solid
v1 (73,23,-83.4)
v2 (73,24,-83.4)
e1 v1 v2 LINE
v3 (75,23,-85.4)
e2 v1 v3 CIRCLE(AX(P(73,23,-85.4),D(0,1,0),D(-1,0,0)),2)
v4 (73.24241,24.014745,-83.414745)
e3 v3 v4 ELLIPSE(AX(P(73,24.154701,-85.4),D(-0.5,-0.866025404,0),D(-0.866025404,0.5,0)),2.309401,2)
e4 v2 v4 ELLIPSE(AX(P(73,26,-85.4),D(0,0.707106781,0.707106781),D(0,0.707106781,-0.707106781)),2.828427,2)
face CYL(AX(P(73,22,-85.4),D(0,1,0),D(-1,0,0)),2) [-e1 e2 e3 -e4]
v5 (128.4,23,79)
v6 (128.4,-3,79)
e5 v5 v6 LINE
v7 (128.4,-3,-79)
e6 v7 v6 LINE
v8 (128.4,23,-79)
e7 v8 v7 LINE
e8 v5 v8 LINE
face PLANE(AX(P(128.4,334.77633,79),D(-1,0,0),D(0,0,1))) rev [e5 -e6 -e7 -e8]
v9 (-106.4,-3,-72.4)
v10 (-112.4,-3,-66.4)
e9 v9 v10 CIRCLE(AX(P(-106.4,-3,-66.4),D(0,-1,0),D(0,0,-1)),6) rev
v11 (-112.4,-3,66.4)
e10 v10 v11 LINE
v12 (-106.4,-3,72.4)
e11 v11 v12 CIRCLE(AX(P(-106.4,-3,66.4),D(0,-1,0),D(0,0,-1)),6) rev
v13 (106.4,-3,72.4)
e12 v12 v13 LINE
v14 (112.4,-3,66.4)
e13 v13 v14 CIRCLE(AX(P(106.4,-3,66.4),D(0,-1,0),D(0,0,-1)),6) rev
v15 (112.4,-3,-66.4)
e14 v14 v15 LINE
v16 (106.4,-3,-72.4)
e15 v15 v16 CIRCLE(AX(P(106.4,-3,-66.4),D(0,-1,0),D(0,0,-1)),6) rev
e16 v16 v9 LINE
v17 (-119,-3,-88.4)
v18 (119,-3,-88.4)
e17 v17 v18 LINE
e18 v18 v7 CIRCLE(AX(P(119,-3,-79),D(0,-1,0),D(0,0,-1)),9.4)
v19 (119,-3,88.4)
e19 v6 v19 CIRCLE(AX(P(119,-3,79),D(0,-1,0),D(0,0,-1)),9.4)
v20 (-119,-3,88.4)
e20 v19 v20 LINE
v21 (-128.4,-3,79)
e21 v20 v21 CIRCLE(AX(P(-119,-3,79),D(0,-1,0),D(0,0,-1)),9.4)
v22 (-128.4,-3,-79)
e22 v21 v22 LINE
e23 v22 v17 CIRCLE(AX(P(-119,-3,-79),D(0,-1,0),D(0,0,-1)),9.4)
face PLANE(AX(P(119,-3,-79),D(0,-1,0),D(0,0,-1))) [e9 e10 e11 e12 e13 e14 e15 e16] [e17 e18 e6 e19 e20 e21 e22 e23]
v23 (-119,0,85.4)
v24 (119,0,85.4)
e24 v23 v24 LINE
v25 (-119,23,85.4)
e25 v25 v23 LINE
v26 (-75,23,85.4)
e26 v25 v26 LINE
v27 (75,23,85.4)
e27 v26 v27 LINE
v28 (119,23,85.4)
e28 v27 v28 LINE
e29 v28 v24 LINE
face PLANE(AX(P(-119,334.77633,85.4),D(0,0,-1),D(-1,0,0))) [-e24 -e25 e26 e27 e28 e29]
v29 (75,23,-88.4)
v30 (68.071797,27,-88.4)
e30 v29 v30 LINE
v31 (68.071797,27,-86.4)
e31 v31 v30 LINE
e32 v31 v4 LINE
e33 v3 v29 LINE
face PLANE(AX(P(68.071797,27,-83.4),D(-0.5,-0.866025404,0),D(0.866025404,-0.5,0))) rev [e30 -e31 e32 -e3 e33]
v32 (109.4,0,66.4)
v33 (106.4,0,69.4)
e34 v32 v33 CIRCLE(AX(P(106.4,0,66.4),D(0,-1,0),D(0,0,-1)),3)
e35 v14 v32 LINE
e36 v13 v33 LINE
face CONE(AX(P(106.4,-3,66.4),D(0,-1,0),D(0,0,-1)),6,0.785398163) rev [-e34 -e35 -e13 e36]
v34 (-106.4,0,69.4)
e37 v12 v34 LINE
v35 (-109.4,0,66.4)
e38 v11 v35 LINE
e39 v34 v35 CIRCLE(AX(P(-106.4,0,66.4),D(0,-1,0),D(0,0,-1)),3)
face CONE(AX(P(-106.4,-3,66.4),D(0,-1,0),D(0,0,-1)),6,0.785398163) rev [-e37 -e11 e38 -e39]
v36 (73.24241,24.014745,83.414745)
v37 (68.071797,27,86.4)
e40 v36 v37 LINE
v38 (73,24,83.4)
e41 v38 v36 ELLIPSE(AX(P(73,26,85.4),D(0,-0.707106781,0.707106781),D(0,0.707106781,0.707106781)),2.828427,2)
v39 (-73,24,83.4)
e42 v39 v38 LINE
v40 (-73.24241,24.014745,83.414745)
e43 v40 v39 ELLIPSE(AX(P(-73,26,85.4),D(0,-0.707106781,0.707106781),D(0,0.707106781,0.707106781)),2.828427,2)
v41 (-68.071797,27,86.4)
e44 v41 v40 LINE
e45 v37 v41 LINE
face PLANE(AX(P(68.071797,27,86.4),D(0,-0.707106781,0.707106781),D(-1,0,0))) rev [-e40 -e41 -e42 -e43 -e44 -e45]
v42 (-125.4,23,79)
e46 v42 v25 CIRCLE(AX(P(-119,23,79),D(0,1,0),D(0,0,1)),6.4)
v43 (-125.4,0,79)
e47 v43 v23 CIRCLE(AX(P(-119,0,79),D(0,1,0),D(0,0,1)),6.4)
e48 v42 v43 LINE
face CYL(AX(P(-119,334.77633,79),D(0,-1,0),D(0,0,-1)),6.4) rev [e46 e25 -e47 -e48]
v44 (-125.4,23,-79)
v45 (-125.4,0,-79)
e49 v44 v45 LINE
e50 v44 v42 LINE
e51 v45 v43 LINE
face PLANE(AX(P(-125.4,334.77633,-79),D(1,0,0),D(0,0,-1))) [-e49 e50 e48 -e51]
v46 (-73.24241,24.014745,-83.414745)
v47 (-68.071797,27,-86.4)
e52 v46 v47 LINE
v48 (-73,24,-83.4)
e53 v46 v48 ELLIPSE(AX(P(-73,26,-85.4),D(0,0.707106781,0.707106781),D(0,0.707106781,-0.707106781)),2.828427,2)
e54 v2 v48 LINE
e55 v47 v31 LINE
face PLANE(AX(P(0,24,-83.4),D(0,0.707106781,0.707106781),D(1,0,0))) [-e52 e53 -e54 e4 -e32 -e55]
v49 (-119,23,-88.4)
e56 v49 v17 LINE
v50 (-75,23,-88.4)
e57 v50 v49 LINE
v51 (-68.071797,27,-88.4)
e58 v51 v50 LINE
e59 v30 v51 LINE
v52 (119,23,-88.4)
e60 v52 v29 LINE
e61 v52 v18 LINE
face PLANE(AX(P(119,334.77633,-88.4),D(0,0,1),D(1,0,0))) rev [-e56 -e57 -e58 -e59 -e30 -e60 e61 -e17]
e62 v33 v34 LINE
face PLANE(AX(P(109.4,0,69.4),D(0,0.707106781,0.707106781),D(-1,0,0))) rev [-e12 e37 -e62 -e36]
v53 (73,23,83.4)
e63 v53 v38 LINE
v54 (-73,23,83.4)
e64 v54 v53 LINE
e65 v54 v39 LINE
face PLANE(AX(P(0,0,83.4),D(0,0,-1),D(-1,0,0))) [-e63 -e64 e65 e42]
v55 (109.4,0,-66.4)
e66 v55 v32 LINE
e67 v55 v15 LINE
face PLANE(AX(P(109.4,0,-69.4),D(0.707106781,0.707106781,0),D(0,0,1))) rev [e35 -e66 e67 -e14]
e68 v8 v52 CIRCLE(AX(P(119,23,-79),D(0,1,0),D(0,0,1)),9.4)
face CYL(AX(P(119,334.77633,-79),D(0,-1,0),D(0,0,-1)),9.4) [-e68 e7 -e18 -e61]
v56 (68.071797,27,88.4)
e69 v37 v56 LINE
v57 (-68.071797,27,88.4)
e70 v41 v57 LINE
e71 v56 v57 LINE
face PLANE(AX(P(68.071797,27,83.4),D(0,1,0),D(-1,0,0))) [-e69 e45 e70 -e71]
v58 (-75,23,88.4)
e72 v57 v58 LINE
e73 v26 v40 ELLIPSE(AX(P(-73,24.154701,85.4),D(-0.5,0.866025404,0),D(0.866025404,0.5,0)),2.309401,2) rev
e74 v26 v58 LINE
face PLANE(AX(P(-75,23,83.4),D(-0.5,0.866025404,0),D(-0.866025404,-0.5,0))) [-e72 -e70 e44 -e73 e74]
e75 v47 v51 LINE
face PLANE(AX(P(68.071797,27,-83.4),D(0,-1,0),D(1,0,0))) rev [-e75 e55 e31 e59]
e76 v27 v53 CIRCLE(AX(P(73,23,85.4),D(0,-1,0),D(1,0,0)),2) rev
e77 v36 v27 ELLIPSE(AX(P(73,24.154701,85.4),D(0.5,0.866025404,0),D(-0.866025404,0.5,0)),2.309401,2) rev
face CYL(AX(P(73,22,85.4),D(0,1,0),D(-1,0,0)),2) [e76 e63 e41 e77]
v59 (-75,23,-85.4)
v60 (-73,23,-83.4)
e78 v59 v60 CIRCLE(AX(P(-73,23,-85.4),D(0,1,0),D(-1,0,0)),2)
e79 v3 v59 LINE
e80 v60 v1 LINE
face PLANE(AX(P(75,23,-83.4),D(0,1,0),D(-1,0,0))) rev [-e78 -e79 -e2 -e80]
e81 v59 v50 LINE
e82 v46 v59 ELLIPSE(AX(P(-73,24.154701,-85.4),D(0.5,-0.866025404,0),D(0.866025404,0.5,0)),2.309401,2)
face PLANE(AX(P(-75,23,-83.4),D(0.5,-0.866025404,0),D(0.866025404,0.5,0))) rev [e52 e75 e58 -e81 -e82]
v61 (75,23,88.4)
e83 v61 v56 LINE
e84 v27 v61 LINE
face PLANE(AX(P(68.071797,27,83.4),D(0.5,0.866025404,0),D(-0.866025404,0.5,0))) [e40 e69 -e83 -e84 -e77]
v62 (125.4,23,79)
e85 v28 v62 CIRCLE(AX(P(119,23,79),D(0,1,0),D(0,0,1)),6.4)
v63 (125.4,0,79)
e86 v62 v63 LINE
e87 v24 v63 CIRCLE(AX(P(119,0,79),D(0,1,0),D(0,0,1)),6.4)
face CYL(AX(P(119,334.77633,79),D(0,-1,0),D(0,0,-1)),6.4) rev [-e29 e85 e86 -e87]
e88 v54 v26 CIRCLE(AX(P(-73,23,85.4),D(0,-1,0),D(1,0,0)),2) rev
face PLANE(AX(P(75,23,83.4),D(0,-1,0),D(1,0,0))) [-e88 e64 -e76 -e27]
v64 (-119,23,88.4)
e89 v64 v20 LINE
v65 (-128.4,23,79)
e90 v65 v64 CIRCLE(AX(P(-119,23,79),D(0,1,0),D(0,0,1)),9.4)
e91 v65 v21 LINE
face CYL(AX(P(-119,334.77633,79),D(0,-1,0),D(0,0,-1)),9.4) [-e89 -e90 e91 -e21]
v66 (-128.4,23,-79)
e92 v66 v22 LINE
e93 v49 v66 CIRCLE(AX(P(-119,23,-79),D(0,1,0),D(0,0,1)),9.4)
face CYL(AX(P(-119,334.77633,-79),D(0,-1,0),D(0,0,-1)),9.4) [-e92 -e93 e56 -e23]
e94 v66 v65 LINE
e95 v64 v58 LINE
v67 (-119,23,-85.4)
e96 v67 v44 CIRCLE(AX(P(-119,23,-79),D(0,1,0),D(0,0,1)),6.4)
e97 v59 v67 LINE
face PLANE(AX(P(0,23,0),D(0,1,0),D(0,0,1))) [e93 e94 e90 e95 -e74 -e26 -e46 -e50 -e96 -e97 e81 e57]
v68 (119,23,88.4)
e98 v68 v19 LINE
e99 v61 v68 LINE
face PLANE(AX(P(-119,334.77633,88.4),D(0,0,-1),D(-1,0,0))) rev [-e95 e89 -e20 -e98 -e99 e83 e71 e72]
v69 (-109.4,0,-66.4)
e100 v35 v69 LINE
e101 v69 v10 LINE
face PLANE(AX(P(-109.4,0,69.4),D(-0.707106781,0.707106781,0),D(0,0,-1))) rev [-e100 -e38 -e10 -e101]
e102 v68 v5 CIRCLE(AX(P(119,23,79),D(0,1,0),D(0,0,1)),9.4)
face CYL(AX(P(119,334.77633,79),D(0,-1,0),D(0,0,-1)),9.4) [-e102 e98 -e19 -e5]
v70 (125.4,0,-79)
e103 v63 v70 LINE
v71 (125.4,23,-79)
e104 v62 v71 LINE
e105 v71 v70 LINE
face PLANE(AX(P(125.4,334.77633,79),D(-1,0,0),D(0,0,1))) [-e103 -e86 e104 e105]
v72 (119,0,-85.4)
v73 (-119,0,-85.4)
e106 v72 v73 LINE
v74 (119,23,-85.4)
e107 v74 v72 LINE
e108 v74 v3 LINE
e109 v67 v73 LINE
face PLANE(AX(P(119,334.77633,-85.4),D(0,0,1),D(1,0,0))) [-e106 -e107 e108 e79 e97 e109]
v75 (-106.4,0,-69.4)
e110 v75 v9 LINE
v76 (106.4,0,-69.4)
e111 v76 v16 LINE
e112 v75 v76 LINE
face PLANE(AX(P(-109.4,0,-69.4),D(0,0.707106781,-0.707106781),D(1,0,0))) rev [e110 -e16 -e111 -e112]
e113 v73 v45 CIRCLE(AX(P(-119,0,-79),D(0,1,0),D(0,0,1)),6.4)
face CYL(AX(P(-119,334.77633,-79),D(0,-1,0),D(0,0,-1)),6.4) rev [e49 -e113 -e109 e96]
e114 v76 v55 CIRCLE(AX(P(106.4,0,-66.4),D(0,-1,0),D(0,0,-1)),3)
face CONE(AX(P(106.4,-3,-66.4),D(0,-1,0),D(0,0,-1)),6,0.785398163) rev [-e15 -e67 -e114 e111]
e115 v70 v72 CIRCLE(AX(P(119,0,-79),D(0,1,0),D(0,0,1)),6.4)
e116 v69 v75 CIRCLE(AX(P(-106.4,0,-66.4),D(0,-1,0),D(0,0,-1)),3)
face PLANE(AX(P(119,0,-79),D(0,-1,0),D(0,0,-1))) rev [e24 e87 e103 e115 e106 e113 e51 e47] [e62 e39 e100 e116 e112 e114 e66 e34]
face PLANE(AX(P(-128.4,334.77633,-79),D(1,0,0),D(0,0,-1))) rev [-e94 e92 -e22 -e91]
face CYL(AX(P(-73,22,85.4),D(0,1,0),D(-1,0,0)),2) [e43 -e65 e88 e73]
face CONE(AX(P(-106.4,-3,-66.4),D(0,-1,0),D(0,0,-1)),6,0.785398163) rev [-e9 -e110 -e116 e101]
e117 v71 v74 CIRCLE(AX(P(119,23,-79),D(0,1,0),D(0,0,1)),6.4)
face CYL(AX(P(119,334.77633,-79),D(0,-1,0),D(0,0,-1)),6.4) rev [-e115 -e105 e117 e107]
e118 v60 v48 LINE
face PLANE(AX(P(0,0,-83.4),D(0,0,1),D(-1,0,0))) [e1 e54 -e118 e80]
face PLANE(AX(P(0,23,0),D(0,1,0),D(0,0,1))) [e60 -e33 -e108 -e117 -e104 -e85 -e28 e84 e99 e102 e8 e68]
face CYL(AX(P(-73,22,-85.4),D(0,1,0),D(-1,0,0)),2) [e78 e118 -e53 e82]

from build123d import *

# Parameters (mm, degrees)
BOSS_EXTRUDE1_DEPTH = 23
BOSS_EXTRUDE2_START = 3
SKETCH2_W           = 218.8
SKETCH2_H           = 138.8
BOSS_EXTRUDE2_DEPTH = 3
FILLET1_R           = 3
CHAMFER1_SIZE       = 3
BOSS_EXTRUDE4_DEPTH = 5
CHAMFER2_SIZE       = 3
CUT_EXTRUDE1_DEPTH  = 5


# Read off the part's stored shape, not the designer's step: Mirror1
with BuildPart() as part:
    # Sketch1 → Boss-Extrude1 (new body)
    with BuildSketch(Plane(origin=(0, 0, 0), x_dir=(1, 0, 0), z_dir=(0, 1, 0))):
        with BuildLine():
            Line((119, 88.4), (-119, 88.4))
            ThreePointArc((-119, 88.4), (-125.646803743, 85.646803743), (-128.4, 79))
            Line((-128.4, 79), (-128.4, -79))
            ThreePointArc((-128.4, -79), (-125.646803743, -85.646803743), (-119, -88.4))
            Line((-119, -88.4), (119, -88.4))
            ThreePointArc((119, -88.4), (125.646803743, -85.646803743), (128.4, -79))
            Line((128.4, -79), (128.4, 79))
            ThreePointArc((128.4, 79), (125.646803743, 85.646803743), (119, 88.4))
        make_face()
        with BuildLine():
            Line((-125.4, 79), (-125.4, -79))
            ThreePointArc((-125.4, -79), (-123.5254834, -83.5254834), (-119, -85.4))
            Line((-119, -85.4), (119, -85.4))
            ThreePointArc((119, -85.4), (123.5254834, -83.5254834), (125.4, -79))
            Line((125.4, -79), (125.4, 79))
            ThreePointArc((125.4, 79), (123.5254834, 83.5254834), (119, 85.4))
            Line((119, 85.4), (-119, 85.4))
            ThreePointArc((-119, 85.4), (-123.5254834, 83.5254834), (-125.4, 79))
        make_face(mode=Mode.SUBTRACT)
    extrude(amount=BOSS_EXTRUDE1_DEPTH)

    # Sketch2 → Boss-Extrude2 (add)
    with BuildSketch(Plane.XZ.offset(BOSS_EXTRUDE2_START)):
        with BuildLine():
            Line((128.4, -79), (128.4, 79))
            ThreePointArc((128.4, 79), (125.646803743, 85.646803743), (119, 88.4))
            Line((119, 88.4), (-119, 88.4))
            ThreePointArc((-119, 88.4), (-125.646803743, 85.646803743), (-128.4, 79))
            Line((-128.4, 79), (-128.4, -79))
            ThreePointArc((-128.4, -79), (-125.646803743, -85.646803743), (-119, -88.4))
            Line((-119, -88.4), (119, -88.4))
            ThreePointArc((119, -88.4), (125.646803743, -85.646803743), (128.4, -79))
        make_face()
        Rectangle(SKETCH2_W, SKETCH2_H, mode=Mode.SUBTRACT)
    extrude(amount=-BOSS_EXTRUDE2_DEPTH)

    # Fillet1
    fillet1_edges = [part.edges().sort_by_distance(p)[0] for p in [
        (109.4, -1.5, 69.4),
        (-109.4, -1.5, 69.4),
        (-109.4, -1.5, -69.4),
        (109.4, -1.5, -69.4),
    ]]
    fillet(fillet1_edges, radius=FILLET1_R)

    # Chamfer1
    chamfer1_edges = [part.edges().sort_by_distance(p)[0] for p in [
        (109.4, -3, 0),
        (108.521320344, -3, 68.521320344),
        (108.521320344, -3, -68.521320344),
        (0, -3, 69.4),
        (0, -3, -69.4),
        (-108.521320344, -3, 68.521320344),
        (-108.521320344, -3, -68.521320344),
        (-109.4, -3, 0),
    ]]
    chamfer(chamfer1_edges, length=CHAMFER1_SIZE - 0.0001)  # a hair under: the kernel refuses the full size

    # Sketch4 → Boss-Extrude4 (add)
    with BuildSketch(Plane.XY.offset(88.4)):
        Polygon((75, 23), (-75, 23), (-68.07179677, 27), (68.07179677, 27), align=None)
    extrude(amount=-BOSS_EXTRUDE4_DEPTH)

    # Chamfer2
    chamfer2_edges = [part.edges().sort_by_distance(p)[0] for p in [
        (0, 27, 83.4),
    ]]
    chamfer(chamfer2_edges, length=CHAMFER2_SIZE)

    # Sketch5 → Cut-Extrude1 (cut)
    with BuildSketch(Plane(origin=(0, 27, 0), x_dir=(1, 0, 0), z_dir=(0, 1, 0))):
        with BuildLine():
            Line((-73, -83.4), (-75, -83.4))
            Line((-75, -83.4), (-75, -85.4))
            ThreePointArc((-75, -85.4), (-74.414213562, -83.985786438), (-73, -83.4))
        make_face()
        with BuildLine():
            Line((75, -83.4), (75, -85.4))
            ThreePointArc((75, -85.4), (74.414213562, -83.985786438), (73, -83.4))
            Line((73, -83.4), (75, -83.4))
        make_face()
    extrude(amount=-CUT_EXTRUDE1_DEPTH, mode=Mode.SUBTRACT)

    # Mirror1: part across plane


with BuildPart() as part_1:
    add(part.part)
    add(part.part.mirror(Plane.XY))


solid = part_1.part
